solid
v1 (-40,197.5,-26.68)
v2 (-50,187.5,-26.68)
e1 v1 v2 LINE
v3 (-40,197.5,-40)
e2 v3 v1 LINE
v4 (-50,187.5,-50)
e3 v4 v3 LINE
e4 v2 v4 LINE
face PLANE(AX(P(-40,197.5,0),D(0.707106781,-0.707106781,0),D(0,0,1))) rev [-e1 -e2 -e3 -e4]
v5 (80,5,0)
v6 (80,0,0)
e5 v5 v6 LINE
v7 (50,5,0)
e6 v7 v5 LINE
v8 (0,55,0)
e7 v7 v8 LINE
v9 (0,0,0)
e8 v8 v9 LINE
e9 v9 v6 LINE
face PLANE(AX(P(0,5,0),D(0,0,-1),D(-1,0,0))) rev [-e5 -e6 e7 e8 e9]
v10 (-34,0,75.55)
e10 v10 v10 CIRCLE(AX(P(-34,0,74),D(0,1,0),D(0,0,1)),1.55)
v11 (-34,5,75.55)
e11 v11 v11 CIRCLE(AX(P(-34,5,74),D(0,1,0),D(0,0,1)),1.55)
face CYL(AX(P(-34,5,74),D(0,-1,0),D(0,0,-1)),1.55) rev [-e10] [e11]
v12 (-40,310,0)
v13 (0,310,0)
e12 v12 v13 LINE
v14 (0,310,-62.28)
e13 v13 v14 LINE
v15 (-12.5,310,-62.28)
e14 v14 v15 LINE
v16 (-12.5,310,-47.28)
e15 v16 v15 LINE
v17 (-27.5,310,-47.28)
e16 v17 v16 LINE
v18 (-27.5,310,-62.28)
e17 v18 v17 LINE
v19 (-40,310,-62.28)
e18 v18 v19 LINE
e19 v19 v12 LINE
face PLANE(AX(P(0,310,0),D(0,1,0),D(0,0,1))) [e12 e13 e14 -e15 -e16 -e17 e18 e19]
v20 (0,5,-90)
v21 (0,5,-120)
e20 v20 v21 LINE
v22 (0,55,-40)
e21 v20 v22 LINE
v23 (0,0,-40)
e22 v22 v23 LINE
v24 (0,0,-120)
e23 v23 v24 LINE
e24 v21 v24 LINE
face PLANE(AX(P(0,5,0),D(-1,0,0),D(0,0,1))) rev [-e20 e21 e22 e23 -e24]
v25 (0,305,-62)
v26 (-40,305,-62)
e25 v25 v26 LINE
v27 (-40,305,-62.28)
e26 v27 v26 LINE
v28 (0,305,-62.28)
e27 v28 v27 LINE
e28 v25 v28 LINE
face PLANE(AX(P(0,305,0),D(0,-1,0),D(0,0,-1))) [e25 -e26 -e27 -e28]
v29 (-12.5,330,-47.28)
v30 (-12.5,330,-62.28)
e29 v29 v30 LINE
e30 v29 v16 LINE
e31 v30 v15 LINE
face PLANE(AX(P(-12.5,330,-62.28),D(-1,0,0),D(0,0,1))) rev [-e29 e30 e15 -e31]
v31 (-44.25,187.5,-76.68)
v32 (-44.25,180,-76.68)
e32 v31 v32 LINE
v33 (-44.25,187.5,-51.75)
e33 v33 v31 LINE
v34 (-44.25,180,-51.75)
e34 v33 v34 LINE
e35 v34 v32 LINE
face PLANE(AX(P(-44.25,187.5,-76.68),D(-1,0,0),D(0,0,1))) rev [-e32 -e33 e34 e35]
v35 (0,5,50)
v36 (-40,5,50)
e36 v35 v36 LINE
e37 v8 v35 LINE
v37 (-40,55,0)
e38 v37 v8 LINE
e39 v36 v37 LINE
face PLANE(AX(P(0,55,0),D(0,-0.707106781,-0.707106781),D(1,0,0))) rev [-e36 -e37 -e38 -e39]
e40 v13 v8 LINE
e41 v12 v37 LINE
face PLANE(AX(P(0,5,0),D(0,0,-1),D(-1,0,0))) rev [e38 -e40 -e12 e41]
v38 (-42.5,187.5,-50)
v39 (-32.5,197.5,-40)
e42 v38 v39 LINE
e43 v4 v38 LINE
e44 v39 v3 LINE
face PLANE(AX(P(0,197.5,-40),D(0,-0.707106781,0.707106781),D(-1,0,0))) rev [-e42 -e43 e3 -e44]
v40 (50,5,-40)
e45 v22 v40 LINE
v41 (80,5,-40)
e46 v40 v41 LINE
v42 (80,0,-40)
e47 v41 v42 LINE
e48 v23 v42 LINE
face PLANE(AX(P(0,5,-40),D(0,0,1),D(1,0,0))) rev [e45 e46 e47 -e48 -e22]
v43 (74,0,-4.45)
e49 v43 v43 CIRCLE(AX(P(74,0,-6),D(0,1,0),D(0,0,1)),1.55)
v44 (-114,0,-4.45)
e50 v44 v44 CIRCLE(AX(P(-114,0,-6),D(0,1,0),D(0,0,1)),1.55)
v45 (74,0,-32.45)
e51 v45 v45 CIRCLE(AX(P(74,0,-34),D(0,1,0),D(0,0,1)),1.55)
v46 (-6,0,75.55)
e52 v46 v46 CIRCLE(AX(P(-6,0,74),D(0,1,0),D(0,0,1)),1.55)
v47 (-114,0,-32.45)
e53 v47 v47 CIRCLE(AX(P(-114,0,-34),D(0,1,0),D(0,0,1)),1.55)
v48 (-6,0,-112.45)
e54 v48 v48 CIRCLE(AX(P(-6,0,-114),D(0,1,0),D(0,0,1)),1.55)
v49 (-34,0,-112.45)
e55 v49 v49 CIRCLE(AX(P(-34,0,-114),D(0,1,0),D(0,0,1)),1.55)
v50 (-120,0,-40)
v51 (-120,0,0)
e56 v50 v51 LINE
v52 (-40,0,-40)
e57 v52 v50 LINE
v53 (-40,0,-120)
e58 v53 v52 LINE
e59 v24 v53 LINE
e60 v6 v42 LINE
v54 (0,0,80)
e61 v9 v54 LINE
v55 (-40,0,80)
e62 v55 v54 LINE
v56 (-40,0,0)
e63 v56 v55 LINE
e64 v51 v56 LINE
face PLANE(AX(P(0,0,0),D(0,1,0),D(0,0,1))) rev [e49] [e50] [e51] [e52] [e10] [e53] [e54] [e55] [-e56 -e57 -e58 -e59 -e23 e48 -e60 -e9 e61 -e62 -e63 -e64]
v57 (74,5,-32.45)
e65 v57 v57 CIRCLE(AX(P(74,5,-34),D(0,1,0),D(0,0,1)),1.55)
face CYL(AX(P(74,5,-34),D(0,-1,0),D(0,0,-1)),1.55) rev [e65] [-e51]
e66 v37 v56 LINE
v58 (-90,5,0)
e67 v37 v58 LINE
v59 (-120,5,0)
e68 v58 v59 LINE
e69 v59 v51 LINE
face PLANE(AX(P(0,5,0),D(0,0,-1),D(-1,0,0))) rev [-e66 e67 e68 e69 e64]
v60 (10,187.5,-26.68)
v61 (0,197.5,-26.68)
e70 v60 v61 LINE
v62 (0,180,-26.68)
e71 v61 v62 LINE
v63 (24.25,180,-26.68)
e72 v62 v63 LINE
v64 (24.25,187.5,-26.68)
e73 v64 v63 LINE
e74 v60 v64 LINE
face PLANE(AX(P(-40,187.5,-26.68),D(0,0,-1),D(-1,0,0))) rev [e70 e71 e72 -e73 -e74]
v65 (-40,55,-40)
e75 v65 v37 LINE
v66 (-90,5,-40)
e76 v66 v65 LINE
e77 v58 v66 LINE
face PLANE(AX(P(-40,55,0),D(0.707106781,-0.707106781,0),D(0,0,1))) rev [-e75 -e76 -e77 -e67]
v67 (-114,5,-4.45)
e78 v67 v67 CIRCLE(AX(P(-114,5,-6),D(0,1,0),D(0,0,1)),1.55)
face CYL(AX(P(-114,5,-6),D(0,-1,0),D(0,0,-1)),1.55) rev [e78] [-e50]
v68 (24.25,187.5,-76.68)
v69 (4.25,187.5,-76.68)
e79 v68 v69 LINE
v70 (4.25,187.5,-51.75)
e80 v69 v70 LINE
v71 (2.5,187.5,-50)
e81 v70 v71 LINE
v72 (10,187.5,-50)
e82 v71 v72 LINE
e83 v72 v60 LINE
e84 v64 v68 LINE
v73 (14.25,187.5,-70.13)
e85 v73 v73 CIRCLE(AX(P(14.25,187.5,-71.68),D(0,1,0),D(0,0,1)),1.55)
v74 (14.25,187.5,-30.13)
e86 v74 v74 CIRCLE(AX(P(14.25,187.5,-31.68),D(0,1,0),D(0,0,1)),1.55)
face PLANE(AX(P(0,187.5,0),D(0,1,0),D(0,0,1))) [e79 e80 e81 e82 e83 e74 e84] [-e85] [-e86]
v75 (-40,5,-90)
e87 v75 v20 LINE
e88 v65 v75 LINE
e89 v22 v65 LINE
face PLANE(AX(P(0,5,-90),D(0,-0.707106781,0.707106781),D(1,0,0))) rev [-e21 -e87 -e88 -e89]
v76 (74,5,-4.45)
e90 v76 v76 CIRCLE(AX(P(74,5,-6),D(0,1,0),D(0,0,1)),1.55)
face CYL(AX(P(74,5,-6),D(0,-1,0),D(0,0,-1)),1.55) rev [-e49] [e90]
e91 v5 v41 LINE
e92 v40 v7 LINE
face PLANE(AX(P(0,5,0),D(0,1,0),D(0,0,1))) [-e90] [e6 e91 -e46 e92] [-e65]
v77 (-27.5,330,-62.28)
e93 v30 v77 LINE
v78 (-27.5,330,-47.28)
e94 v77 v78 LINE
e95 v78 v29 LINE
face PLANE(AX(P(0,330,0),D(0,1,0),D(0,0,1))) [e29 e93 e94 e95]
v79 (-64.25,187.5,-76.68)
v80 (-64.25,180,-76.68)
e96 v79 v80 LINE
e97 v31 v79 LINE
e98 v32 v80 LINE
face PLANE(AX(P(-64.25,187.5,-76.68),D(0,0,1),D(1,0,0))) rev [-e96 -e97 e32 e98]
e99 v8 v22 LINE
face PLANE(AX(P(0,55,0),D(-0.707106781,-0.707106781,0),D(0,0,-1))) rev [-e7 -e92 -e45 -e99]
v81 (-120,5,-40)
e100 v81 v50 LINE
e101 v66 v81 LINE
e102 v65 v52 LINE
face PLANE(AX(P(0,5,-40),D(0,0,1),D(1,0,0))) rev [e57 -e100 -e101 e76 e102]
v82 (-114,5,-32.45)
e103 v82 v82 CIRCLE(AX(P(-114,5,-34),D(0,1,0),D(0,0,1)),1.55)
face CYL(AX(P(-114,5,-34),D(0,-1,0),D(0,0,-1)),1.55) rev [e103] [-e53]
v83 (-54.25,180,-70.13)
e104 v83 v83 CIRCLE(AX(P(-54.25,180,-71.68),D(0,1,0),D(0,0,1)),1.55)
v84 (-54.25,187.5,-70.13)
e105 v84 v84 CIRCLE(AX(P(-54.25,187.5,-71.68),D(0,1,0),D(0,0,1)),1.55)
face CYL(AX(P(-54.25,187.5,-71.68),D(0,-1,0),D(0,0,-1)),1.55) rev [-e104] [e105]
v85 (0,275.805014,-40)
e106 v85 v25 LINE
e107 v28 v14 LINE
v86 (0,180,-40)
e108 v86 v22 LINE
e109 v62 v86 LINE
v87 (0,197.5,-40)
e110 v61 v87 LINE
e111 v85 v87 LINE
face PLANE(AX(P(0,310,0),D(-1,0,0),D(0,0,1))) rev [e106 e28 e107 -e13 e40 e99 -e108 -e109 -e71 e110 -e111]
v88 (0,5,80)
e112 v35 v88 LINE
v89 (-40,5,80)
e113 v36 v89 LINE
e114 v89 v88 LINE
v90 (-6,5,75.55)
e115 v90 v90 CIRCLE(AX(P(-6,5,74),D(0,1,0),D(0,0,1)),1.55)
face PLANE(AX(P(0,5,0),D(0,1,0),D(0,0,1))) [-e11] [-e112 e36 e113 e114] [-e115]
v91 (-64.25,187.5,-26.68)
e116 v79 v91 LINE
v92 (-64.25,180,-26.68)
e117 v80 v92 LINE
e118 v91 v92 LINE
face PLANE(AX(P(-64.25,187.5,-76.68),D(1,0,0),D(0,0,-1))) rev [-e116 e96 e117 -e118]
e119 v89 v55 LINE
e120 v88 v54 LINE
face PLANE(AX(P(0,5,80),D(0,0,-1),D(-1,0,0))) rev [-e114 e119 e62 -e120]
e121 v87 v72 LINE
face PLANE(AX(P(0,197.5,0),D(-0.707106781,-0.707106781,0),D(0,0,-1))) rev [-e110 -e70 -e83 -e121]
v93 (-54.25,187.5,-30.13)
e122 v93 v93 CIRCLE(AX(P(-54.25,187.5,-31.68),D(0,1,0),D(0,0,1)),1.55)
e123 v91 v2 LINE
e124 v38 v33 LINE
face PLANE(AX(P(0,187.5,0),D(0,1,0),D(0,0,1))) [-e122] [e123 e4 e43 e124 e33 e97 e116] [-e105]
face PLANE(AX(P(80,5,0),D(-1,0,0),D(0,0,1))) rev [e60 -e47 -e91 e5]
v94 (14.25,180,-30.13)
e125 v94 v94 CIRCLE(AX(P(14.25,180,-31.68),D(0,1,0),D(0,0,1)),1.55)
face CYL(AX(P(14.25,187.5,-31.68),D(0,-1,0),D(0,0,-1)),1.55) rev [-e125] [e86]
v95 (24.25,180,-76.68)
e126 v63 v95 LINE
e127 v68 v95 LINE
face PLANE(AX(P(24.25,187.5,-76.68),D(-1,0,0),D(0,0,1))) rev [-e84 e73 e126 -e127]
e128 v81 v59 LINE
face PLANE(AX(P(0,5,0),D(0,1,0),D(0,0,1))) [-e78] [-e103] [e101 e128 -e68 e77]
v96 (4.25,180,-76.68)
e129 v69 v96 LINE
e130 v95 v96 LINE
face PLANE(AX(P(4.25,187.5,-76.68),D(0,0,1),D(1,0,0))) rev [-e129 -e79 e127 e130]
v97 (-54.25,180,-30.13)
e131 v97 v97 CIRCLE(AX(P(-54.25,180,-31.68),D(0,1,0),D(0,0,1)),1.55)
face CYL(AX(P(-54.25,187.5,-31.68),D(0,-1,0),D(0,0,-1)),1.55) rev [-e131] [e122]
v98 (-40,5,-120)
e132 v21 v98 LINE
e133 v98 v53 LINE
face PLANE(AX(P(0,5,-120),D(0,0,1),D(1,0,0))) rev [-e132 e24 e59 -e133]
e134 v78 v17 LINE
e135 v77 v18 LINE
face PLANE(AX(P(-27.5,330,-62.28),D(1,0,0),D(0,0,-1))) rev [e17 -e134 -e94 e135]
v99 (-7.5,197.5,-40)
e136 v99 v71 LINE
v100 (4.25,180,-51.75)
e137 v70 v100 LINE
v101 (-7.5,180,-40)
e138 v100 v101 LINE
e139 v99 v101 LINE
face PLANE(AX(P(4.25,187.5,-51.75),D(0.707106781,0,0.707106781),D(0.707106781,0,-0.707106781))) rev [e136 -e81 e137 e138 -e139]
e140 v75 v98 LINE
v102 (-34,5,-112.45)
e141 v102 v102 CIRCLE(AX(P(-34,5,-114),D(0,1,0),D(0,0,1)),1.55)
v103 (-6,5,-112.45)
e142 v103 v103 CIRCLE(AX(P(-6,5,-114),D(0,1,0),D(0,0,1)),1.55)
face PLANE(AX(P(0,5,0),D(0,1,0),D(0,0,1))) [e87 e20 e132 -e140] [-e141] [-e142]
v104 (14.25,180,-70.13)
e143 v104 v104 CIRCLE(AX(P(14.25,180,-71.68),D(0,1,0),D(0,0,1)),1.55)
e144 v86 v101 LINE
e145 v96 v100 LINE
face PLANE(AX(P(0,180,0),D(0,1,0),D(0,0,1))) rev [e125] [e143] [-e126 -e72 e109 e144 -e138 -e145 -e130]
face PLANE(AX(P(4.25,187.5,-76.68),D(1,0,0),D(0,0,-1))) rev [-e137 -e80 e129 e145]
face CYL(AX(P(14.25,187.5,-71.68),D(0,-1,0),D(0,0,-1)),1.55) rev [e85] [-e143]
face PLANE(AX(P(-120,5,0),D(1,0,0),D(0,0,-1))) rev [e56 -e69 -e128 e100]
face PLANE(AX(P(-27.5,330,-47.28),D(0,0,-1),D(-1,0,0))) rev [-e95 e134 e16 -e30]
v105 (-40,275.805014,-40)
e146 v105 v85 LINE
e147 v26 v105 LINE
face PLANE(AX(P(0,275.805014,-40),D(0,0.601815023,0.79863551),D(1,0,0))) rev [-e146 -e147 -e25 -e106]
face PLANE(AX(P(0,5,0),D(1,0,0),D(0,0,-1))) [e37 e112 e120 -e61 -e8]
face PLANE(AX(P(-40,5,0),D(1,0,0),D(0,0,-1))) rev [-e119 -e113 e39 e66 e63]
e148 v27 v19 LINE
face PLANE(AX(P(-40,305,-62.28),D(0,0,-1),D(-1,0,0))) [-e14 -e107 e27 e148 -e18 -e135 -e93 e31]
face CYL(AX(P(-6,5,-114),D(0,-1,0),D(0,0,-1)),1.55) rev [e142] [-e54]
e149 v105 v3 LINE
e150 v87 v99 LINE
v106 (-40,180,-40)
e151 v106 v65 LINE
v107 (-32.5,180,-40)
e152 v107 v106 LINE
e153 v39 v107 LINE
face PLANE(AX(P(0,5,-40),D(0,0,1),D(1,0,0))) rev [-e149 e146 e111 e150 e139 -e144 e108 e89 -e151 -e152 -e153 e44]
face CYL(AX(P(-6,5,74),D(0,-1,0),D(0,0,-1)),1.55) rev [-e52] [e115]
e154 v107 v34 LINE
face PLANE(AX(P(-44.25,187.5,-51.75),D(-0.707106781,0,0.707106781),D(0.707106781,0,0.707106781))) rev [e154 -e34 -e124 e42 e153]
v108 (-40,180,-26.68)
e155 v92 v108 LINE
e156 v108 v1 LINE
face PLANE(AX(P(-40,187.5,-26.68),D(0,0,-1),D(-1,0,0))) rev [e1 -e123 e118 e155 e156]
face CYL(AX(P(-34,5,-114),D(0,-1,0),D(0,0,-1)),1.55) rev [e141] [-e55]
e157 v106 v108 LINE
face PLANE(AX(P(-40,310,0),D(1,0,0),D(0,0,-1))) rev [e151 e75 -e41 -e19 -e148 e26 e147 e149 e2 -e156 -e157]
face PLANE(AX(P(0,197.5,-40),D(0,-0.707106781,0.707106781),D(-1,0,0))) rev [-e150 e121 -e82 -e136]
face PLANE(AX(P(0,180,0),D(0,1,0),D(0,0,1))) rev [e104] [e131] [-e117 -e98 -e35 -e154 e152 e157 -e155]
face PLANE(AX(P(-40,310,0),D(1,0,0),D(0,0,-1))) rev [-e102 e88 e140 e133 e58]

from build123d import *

# Parameters (mm, degrees)
SKETCH1_W             = 80
SKETCH1_H             = 40
SKETCH1_R             = 1.55
BOSS_EXTRUDE1_DEPTH   = 5
SKETCH1_W_2           = 40
SKETCH1_H_2           = 80
BOSS_EXTRUDE1_2_DEPTH = 5
BOSS_EXTRUDE1_3_DEPTH = 5
BOSS_EXTRUDE1_4_DEPTH = 5
SKETCH1_4_W           = 40
SKETCH1_4_H           = 40
BOSS_EXTRUDE2_DEPTH   = 310
CHAMFER1_SIZE         = 50
CHAMFER2_SIZE         = 50
BOSS_EXTRUDE3_START   = 180
SKETCH2_R             = 1.55
BOSS_EXTRUDE3_DEPTH   = 7.5
CHAMFER7_SIZE         = 10
SKETCH3_W             = 15
SKETCH3_H             = 15
BOSS_EXTRUDE4_DEPTH   = 20
SKETCH4_W             = 40
SKETCH4_H             = 22.28
BOSS_EXTRUDE5_DEPTH   = 5
CHAMFER8_SIZE         = 22
CHAMFER8_SIZE2        = 29.194986076


# Some blends are built 0.0001 mm under size
with BuildPart() as part:
    # Sketch1 → Boss-Extrude1 (new body)
    with BuildSketch(Plane(origin=(0, 0, 0), x_dir=(1, 0, 0), z_dir=(0, 1, 0))):
        with Locations((40, 20)):
            Rectangle(SKETCH1_W, SKETCH1_H)
        with Locations(Location((74, 6, 0), (0, 0, 270))):
            Circle(SKETCH1_R, mode=Mode.SUBTRACT)
        with Locations(Location((74, 34, 0), (0, 0, 270))):
            Circle(SKETCH1_R, mode=Mode.SUBTRACT)
    extrude(amount=BOSS_EXTRUDE1_DEPTH)



with BuildPart() as body_2:
    # Sketch1 → Boss-Extrude1 2 (new body)
    with BuildSketch(Plane(origin=(0, 0, 0), x_dir=(1, 0, 0), z_dir=(0, 1, 0))):
        with Locations((-20, 80)):
            Rectangle(SKETCH1_W_2, SKETCH1_H_2)
        with Locations(Location((-34, 114, 0), (0, 0, 270))):
            Circle(SKETCH1_R, mode=Mode.SUBTRACT)
        with Locations(Location((-6, 114, 0), (0, 0, 270))):
            Circle(SKETCH1_R, mode=Mode.SUBTRACT)
    extrude(amount=BOSS_EXTRUDE1_2_DEPTH)


with BuildPart() as body_3:
    # Sketch1 → Boss-Extrude1 3 (new body)
    with BuildSketch(Plane(origin=(0, 0, 0), x_dir=(1, 0, 0), z_dir=(0, 1, 0))):
        with Locations((-80, 20)):
            Rectangle(SKETCH1_W, SKETCH1_H)
        with Locations(Location((-114, 6, 0), (0, 0, 270))):
            Circle(SKETCH1_R, mode=Mode.SUBTRACT)
        with Locations(Location((-114, 34, 0), (0, 0, 270))):
            Circle(SKETCH1_R, mode=Mode.SUBTRACT)
    extrude(amount=BOSS_EXTRUDE1_3_DEPTH)


with BuildPart() as body_4:
    # Sketch1 → Boss-Extrude1 4 (new body)
    with BuildSketch(Plane(origin=(0, 0, 0), x_dir=(1, 0, 0), z_dir=(0, 1, 0))):
        with Locations((-20, -40)):
            Rectangle(SKETCH1_W_2, SKETCH1_H_2)
        with Locations(Location((-34, -74, 0), (0, 0, 270))):
            Circle(SKETCH1_R, mode=Mode.SUBTRACT)
        with Locations(Location((-6, -74, 0), (0, 0, 270))):
            Circle(SKETCH1_R, mode=Mode.SUBTRACT)
    extrude(amount=BOSS_EXTRUDE1_4_DEPTH)


with BuildPart() as part_1:
    add(part.part)

    add(body_2.part)  # Boss-Extrude2 merges body 2

    add(body_3.part)  # Boss-Extrude2 merges body 3

    add(body_4.part)  # Boss-Extrude2 merges body 4
    # Sketch1<4> → Boss-Extrude2 (add)
    with BuildSketch(Plane(origin=(0, 0, 0), x_dir=(1, 0, 0), z_dir=(0, 1, 0))):
        with Locations((-20, 20)):
            Rectangle(SKETCH1_4_W, SKETCH1_4_H)
    extrude(amount=BOSS_EXTRUDE2_DEPTH)

    # Chamfer1
    # the kernel refuses this chamfer: 50 mm, written as the material it adds along each edge
    with BuildSketch(Plane(origin=(0, 5, -40), x_dir=(1, 0, 0), z_dir=(0, 0, 1)), Plane(origin=(-40, 5, 0), x_dir=(-1, 0, 0), z_dir=(0, 0, -1))) as chamfer1_piece_1:
        Polygon((CHAMFER1_SIZE, 0), (0, CHAMFER1_SIZE), (0, 0), align=None)
    extrude(amount=40)

    # Chamfer2
    chamfer2_edges = [part_1.edges().sort_by_distance(p)[0] for p in [
        (-20, 5, -40),
        (-20, 5, 0),
    ]]
    chamfer(chamfer2_edges, length=CHAMFER2_SIZE - 0.0001)  # a hair under: the kernel refuses the full size

    # Sketch2 → Boss-Extrude3 (add)
    with BuildSketch(Plane(origin=(0, 0, 0), x_dir=(1, 0, 0), z_dir=(0, 1, 0)).offset(BOSS_EXTRUDE3_START)):
        Polygon((-64.25, 76.68), (-44.25, 76.68), (-44.25, 51.75), (-32.5, 40), (-7.5, 40), (4.25, 51.75), (4.25, 76.68), (24.25, 76.68), (24.25, 26.68), (-40, 26.68), (-64.25, 26.68), align=None)
        with Locations(Location((-54.25, 71.68, 0), (0, 0, 270))):
            Circle(SKETCH2_R, mode=Mode.SUBTRACT)
        with Locations(Location((14.25, 71.68, 0), (0, 0, 270))):
            Circle(SKETCH2_R, mode=Mode.SUBTRACT)
        with Locations(Location((-54.25, 31.68, 0), (0, 0, 270))):
            Circle(SKETCH2_R, mode=Mode.SUBTRACT)
        with Locations(Location((14.25, 31.68, 0), (0, 0, 270))):
            Circle(SKETCH2_R, mode=Mode.SUBTRACT)
    extrude(amount=BOSS_EXTRUDE3_DEPTH)

    # Chamfer7
    # the kernel refuses this chamfer: 10 mm, written as the material it adds along each edge
    with BuildSketch(Plane(origin=(-40, 187.5, -26.68), x_dir=(0, 1, 0), z_dir=(0, 0, -1))) as chamfer7_piece_1_section:
        Polygon((CHAMFER7_SIZE, 0), (0, -CHAMFER7_SIZE), (0, 0), align=None)
    chamfer7_piece_1 = extrude(amount=39.03682988, mode=Mode.PRIVATE)
    chamfer7_piece_1 = split(chamfer7_piece_1, bisect_by=Plane(origin=(-29.59, 187.5, -37.09), z_dir=(-0.7071067811865485, 0, 0.7071067811865467)), keep=Keep.TOP, mode=Mode.PRIVATE)
    chamfer7_piece_1 = split(chamfer7_piece_1, bisect_by=Plane(origin=(-40, 199.16, -38.34), z_dir=(0, -0.7071067811865476, 0.7071067811865476)), keep=Keep.TOP, mode=Mode.PRIVATE)
    add(chamfer7_piece_1)
    with BuildSketch(Plane(origin=(0, 187.5, -65.71682988), x_dir=(0, 1, 0), z_dir=(0, 0, 1))) as chamfer7_piece_2_section:
        Polygon((CHAMFER7_SIZE, 0), (0, -CHAMFER7_SIZE), (0, 0), align=None)
    chamfer7_piece_2 = extrude(amount=39.03682988, mode=Mode.PRIVATE)
    chamfer7_piece_2 = split(chamfer7_piece_2, bisect_by=Plane(origin=(9.10841494, 187.5, -56.60841494), z_dir=(0.7071067811865488, 0, 0.7071067811865462)), keep=Keep.TOP, mode=Mode.PRIVATE)
    chamfer7_piece_2 = split(chamfer7_piece_2, bisect_by=Plane(origin=(0, 179.64158506, -57.85841494), z_dir=(0, -0.7071067811865476, 0.7071067811865476)), keep=Keep.TOP, mode=Mode.PRIVATE)
    add(chamfer7_piece_2)
    with BuildSketch(Plane(origin=(-33.21682988, 187.5, -40), x_dir=(0, 1, 0), z_dir=(1, 0, 0))) as chamfer7_piece_3_section:
        Polygon((CHAMFER7_SIZE, 0), (0, -CHAMFER7_SIZE), (0, 0), align=None)
    chamfer7_piece_3 = extrude(amount=58.933659759, mode=Mode.PRIVATE)
    chamfer7_piece_3 = split(chamfer7_piece_3, bisect_by=Plane(origin=(-32.85841494, 187.5, -40.35841494), z_dir=(-0.7071067811865485, 0, 0.7071067811865467)), keep=Keep.TOP, mode=Mode.PRIVATE)
    add(chamfer7_piece_3)
    with BuildSketch(Plane(origin=(-33.21682988, 187.5, -40), x_dir=(0, 1, 0), z_dir=(1, 0, 0))) as chamfer7_piece_4_section:
        Polygon((CHAMFER7_SIZE, 0), (0, -CHAMFER7_SIZE), (0, 0), align=None)
    chamfer7_piece_4 = extrude(amount=58.933659759, mode=Mode.PRIVATE)
    chamfer7_piece_4 = split(chamfer7_piece_4, bisect_by=Plane(origin=(-20.35841494, 187.5, -27.14158506), z_dir=(0.7071067811865488, 0, 0.7071067811865462)), keep=Keep.TOP, mode=Mode.PRIVATE)
    chamfer7_piece_4 = split(chamfer7_piece_4, bisect_by=Plane(origin=(-11.60841494, 209.10841494, -40), z_dir=(-0.7071067811865476, -0.7071067811865476, 0)), keep=Keep.TOP, mode=Mode.PRIVATE)
    add(chamfer7_piece_4)
    with BuildSketch(Plane(origin=(-65.71682988, 187.5, -40), x_dir=(0, 1, 0), z_dir=(1, 0, 0))) as chamfer7_piece_5_section:
        Polygon((CHAMFER7_SIZE, 0), (0, -CHAMFER7_SIZE), (0, 0), align=None)
    chamfer7_piece_5 = extrude(amount=58.933659759, mode=Mode.PRIVATE)
    chamfer7_piece_5 = split(chamfer7_piece_5, bisect_by=Plane(origin=(-49.10841494, 187.5, -56.60841494), z_dir=(-0.7071067811865485, 0, 0.7071067811865467)), keep=Keep.TOP, mode=Mode.PRIVATE)
    chamfer7_piece_5 = split(chamfer7_piece_5, bisect_by=Plane(origin=(-57.85841494, 179.64158506, -40), z_dir=(0.7071067811865476, -0.7071067811865476, 0)), keep=Keep.TOP, mode=Mode.PRIVATE)
    add(chamfer7_piece_5)
    with BuildSketch(Plane(origin=(-65.71682988, 187.5, -40), x_dir=(0, 1, 0), z_dir=(1, 0, 0))) as chamfer7_piece_6_section:
        Polygon((CHAMFER7_SIZE, 0), (0, -CHAMFER7_SIZE), (0, 0), align=None)
    chamfer7_piece_6 = extrude(amount=58.933659759, mode=Mode.PRIVATE)
    chamfer7_piece_6 = split(chamfer7_piece_6, bisect_by=Plane(origin=(-36.60841494, 187.5, -10.89158506), z_dir=(0.7071067811865488, 0, 0.7071067811865462)), keep=Keep.TOP, mode=Mode.PRIVATE)
    add(chamfer7_piece_6)



with BuildPart() as body_2_2:
    # Sketch3 → Boss-Extrude4 (new body)
    with BuildSketch(Plane(origin=(0, 310, 0), x_dir=(1, 0, 0), z_dir=(0, 1, 0))):
        with Locations((-20, 54.78)):
            Rectangle(SKETCH3_W, SKETCH3_H)
    extrude(amount=BOSS_EXTRUDE4_DEPTH)


with BuildPart() as part_2:
    add(part_1.part)

    add(body_2_2.part)  # Boss-Extrude5 merges body 2 2
    # Sketch4 → Boss-Extrude5 (add)
    with BuildSketch(Plane(origin=(0, 310, 0), x_dir=(1, 0, 0), z_dir=(0, 1, 0))):
        with Locations((-20, 51.14)):
            Rectangle(SKETCH4_W, SKETCH4_H)
    extrude(amount=-BOSS_EXTRUDE5_DEPTH)

    # Chamfer8
    chamfer8_edges = [part_2.edges().sort_by_distance(p)[0] for p in [
        (-20, 305, -40),
    ]]
    chamfer8_side = [part_2.faces().sort_by_distance(p)[0] for p in [
        (-20, 305, -51.14),
    ]]
    chamfer(chamfer8_edges, length=CHAMFER8_SIZE, length2=CHAMFER8_SIZE2, reference=chamfer8_side[0])


solid = part_2.part
